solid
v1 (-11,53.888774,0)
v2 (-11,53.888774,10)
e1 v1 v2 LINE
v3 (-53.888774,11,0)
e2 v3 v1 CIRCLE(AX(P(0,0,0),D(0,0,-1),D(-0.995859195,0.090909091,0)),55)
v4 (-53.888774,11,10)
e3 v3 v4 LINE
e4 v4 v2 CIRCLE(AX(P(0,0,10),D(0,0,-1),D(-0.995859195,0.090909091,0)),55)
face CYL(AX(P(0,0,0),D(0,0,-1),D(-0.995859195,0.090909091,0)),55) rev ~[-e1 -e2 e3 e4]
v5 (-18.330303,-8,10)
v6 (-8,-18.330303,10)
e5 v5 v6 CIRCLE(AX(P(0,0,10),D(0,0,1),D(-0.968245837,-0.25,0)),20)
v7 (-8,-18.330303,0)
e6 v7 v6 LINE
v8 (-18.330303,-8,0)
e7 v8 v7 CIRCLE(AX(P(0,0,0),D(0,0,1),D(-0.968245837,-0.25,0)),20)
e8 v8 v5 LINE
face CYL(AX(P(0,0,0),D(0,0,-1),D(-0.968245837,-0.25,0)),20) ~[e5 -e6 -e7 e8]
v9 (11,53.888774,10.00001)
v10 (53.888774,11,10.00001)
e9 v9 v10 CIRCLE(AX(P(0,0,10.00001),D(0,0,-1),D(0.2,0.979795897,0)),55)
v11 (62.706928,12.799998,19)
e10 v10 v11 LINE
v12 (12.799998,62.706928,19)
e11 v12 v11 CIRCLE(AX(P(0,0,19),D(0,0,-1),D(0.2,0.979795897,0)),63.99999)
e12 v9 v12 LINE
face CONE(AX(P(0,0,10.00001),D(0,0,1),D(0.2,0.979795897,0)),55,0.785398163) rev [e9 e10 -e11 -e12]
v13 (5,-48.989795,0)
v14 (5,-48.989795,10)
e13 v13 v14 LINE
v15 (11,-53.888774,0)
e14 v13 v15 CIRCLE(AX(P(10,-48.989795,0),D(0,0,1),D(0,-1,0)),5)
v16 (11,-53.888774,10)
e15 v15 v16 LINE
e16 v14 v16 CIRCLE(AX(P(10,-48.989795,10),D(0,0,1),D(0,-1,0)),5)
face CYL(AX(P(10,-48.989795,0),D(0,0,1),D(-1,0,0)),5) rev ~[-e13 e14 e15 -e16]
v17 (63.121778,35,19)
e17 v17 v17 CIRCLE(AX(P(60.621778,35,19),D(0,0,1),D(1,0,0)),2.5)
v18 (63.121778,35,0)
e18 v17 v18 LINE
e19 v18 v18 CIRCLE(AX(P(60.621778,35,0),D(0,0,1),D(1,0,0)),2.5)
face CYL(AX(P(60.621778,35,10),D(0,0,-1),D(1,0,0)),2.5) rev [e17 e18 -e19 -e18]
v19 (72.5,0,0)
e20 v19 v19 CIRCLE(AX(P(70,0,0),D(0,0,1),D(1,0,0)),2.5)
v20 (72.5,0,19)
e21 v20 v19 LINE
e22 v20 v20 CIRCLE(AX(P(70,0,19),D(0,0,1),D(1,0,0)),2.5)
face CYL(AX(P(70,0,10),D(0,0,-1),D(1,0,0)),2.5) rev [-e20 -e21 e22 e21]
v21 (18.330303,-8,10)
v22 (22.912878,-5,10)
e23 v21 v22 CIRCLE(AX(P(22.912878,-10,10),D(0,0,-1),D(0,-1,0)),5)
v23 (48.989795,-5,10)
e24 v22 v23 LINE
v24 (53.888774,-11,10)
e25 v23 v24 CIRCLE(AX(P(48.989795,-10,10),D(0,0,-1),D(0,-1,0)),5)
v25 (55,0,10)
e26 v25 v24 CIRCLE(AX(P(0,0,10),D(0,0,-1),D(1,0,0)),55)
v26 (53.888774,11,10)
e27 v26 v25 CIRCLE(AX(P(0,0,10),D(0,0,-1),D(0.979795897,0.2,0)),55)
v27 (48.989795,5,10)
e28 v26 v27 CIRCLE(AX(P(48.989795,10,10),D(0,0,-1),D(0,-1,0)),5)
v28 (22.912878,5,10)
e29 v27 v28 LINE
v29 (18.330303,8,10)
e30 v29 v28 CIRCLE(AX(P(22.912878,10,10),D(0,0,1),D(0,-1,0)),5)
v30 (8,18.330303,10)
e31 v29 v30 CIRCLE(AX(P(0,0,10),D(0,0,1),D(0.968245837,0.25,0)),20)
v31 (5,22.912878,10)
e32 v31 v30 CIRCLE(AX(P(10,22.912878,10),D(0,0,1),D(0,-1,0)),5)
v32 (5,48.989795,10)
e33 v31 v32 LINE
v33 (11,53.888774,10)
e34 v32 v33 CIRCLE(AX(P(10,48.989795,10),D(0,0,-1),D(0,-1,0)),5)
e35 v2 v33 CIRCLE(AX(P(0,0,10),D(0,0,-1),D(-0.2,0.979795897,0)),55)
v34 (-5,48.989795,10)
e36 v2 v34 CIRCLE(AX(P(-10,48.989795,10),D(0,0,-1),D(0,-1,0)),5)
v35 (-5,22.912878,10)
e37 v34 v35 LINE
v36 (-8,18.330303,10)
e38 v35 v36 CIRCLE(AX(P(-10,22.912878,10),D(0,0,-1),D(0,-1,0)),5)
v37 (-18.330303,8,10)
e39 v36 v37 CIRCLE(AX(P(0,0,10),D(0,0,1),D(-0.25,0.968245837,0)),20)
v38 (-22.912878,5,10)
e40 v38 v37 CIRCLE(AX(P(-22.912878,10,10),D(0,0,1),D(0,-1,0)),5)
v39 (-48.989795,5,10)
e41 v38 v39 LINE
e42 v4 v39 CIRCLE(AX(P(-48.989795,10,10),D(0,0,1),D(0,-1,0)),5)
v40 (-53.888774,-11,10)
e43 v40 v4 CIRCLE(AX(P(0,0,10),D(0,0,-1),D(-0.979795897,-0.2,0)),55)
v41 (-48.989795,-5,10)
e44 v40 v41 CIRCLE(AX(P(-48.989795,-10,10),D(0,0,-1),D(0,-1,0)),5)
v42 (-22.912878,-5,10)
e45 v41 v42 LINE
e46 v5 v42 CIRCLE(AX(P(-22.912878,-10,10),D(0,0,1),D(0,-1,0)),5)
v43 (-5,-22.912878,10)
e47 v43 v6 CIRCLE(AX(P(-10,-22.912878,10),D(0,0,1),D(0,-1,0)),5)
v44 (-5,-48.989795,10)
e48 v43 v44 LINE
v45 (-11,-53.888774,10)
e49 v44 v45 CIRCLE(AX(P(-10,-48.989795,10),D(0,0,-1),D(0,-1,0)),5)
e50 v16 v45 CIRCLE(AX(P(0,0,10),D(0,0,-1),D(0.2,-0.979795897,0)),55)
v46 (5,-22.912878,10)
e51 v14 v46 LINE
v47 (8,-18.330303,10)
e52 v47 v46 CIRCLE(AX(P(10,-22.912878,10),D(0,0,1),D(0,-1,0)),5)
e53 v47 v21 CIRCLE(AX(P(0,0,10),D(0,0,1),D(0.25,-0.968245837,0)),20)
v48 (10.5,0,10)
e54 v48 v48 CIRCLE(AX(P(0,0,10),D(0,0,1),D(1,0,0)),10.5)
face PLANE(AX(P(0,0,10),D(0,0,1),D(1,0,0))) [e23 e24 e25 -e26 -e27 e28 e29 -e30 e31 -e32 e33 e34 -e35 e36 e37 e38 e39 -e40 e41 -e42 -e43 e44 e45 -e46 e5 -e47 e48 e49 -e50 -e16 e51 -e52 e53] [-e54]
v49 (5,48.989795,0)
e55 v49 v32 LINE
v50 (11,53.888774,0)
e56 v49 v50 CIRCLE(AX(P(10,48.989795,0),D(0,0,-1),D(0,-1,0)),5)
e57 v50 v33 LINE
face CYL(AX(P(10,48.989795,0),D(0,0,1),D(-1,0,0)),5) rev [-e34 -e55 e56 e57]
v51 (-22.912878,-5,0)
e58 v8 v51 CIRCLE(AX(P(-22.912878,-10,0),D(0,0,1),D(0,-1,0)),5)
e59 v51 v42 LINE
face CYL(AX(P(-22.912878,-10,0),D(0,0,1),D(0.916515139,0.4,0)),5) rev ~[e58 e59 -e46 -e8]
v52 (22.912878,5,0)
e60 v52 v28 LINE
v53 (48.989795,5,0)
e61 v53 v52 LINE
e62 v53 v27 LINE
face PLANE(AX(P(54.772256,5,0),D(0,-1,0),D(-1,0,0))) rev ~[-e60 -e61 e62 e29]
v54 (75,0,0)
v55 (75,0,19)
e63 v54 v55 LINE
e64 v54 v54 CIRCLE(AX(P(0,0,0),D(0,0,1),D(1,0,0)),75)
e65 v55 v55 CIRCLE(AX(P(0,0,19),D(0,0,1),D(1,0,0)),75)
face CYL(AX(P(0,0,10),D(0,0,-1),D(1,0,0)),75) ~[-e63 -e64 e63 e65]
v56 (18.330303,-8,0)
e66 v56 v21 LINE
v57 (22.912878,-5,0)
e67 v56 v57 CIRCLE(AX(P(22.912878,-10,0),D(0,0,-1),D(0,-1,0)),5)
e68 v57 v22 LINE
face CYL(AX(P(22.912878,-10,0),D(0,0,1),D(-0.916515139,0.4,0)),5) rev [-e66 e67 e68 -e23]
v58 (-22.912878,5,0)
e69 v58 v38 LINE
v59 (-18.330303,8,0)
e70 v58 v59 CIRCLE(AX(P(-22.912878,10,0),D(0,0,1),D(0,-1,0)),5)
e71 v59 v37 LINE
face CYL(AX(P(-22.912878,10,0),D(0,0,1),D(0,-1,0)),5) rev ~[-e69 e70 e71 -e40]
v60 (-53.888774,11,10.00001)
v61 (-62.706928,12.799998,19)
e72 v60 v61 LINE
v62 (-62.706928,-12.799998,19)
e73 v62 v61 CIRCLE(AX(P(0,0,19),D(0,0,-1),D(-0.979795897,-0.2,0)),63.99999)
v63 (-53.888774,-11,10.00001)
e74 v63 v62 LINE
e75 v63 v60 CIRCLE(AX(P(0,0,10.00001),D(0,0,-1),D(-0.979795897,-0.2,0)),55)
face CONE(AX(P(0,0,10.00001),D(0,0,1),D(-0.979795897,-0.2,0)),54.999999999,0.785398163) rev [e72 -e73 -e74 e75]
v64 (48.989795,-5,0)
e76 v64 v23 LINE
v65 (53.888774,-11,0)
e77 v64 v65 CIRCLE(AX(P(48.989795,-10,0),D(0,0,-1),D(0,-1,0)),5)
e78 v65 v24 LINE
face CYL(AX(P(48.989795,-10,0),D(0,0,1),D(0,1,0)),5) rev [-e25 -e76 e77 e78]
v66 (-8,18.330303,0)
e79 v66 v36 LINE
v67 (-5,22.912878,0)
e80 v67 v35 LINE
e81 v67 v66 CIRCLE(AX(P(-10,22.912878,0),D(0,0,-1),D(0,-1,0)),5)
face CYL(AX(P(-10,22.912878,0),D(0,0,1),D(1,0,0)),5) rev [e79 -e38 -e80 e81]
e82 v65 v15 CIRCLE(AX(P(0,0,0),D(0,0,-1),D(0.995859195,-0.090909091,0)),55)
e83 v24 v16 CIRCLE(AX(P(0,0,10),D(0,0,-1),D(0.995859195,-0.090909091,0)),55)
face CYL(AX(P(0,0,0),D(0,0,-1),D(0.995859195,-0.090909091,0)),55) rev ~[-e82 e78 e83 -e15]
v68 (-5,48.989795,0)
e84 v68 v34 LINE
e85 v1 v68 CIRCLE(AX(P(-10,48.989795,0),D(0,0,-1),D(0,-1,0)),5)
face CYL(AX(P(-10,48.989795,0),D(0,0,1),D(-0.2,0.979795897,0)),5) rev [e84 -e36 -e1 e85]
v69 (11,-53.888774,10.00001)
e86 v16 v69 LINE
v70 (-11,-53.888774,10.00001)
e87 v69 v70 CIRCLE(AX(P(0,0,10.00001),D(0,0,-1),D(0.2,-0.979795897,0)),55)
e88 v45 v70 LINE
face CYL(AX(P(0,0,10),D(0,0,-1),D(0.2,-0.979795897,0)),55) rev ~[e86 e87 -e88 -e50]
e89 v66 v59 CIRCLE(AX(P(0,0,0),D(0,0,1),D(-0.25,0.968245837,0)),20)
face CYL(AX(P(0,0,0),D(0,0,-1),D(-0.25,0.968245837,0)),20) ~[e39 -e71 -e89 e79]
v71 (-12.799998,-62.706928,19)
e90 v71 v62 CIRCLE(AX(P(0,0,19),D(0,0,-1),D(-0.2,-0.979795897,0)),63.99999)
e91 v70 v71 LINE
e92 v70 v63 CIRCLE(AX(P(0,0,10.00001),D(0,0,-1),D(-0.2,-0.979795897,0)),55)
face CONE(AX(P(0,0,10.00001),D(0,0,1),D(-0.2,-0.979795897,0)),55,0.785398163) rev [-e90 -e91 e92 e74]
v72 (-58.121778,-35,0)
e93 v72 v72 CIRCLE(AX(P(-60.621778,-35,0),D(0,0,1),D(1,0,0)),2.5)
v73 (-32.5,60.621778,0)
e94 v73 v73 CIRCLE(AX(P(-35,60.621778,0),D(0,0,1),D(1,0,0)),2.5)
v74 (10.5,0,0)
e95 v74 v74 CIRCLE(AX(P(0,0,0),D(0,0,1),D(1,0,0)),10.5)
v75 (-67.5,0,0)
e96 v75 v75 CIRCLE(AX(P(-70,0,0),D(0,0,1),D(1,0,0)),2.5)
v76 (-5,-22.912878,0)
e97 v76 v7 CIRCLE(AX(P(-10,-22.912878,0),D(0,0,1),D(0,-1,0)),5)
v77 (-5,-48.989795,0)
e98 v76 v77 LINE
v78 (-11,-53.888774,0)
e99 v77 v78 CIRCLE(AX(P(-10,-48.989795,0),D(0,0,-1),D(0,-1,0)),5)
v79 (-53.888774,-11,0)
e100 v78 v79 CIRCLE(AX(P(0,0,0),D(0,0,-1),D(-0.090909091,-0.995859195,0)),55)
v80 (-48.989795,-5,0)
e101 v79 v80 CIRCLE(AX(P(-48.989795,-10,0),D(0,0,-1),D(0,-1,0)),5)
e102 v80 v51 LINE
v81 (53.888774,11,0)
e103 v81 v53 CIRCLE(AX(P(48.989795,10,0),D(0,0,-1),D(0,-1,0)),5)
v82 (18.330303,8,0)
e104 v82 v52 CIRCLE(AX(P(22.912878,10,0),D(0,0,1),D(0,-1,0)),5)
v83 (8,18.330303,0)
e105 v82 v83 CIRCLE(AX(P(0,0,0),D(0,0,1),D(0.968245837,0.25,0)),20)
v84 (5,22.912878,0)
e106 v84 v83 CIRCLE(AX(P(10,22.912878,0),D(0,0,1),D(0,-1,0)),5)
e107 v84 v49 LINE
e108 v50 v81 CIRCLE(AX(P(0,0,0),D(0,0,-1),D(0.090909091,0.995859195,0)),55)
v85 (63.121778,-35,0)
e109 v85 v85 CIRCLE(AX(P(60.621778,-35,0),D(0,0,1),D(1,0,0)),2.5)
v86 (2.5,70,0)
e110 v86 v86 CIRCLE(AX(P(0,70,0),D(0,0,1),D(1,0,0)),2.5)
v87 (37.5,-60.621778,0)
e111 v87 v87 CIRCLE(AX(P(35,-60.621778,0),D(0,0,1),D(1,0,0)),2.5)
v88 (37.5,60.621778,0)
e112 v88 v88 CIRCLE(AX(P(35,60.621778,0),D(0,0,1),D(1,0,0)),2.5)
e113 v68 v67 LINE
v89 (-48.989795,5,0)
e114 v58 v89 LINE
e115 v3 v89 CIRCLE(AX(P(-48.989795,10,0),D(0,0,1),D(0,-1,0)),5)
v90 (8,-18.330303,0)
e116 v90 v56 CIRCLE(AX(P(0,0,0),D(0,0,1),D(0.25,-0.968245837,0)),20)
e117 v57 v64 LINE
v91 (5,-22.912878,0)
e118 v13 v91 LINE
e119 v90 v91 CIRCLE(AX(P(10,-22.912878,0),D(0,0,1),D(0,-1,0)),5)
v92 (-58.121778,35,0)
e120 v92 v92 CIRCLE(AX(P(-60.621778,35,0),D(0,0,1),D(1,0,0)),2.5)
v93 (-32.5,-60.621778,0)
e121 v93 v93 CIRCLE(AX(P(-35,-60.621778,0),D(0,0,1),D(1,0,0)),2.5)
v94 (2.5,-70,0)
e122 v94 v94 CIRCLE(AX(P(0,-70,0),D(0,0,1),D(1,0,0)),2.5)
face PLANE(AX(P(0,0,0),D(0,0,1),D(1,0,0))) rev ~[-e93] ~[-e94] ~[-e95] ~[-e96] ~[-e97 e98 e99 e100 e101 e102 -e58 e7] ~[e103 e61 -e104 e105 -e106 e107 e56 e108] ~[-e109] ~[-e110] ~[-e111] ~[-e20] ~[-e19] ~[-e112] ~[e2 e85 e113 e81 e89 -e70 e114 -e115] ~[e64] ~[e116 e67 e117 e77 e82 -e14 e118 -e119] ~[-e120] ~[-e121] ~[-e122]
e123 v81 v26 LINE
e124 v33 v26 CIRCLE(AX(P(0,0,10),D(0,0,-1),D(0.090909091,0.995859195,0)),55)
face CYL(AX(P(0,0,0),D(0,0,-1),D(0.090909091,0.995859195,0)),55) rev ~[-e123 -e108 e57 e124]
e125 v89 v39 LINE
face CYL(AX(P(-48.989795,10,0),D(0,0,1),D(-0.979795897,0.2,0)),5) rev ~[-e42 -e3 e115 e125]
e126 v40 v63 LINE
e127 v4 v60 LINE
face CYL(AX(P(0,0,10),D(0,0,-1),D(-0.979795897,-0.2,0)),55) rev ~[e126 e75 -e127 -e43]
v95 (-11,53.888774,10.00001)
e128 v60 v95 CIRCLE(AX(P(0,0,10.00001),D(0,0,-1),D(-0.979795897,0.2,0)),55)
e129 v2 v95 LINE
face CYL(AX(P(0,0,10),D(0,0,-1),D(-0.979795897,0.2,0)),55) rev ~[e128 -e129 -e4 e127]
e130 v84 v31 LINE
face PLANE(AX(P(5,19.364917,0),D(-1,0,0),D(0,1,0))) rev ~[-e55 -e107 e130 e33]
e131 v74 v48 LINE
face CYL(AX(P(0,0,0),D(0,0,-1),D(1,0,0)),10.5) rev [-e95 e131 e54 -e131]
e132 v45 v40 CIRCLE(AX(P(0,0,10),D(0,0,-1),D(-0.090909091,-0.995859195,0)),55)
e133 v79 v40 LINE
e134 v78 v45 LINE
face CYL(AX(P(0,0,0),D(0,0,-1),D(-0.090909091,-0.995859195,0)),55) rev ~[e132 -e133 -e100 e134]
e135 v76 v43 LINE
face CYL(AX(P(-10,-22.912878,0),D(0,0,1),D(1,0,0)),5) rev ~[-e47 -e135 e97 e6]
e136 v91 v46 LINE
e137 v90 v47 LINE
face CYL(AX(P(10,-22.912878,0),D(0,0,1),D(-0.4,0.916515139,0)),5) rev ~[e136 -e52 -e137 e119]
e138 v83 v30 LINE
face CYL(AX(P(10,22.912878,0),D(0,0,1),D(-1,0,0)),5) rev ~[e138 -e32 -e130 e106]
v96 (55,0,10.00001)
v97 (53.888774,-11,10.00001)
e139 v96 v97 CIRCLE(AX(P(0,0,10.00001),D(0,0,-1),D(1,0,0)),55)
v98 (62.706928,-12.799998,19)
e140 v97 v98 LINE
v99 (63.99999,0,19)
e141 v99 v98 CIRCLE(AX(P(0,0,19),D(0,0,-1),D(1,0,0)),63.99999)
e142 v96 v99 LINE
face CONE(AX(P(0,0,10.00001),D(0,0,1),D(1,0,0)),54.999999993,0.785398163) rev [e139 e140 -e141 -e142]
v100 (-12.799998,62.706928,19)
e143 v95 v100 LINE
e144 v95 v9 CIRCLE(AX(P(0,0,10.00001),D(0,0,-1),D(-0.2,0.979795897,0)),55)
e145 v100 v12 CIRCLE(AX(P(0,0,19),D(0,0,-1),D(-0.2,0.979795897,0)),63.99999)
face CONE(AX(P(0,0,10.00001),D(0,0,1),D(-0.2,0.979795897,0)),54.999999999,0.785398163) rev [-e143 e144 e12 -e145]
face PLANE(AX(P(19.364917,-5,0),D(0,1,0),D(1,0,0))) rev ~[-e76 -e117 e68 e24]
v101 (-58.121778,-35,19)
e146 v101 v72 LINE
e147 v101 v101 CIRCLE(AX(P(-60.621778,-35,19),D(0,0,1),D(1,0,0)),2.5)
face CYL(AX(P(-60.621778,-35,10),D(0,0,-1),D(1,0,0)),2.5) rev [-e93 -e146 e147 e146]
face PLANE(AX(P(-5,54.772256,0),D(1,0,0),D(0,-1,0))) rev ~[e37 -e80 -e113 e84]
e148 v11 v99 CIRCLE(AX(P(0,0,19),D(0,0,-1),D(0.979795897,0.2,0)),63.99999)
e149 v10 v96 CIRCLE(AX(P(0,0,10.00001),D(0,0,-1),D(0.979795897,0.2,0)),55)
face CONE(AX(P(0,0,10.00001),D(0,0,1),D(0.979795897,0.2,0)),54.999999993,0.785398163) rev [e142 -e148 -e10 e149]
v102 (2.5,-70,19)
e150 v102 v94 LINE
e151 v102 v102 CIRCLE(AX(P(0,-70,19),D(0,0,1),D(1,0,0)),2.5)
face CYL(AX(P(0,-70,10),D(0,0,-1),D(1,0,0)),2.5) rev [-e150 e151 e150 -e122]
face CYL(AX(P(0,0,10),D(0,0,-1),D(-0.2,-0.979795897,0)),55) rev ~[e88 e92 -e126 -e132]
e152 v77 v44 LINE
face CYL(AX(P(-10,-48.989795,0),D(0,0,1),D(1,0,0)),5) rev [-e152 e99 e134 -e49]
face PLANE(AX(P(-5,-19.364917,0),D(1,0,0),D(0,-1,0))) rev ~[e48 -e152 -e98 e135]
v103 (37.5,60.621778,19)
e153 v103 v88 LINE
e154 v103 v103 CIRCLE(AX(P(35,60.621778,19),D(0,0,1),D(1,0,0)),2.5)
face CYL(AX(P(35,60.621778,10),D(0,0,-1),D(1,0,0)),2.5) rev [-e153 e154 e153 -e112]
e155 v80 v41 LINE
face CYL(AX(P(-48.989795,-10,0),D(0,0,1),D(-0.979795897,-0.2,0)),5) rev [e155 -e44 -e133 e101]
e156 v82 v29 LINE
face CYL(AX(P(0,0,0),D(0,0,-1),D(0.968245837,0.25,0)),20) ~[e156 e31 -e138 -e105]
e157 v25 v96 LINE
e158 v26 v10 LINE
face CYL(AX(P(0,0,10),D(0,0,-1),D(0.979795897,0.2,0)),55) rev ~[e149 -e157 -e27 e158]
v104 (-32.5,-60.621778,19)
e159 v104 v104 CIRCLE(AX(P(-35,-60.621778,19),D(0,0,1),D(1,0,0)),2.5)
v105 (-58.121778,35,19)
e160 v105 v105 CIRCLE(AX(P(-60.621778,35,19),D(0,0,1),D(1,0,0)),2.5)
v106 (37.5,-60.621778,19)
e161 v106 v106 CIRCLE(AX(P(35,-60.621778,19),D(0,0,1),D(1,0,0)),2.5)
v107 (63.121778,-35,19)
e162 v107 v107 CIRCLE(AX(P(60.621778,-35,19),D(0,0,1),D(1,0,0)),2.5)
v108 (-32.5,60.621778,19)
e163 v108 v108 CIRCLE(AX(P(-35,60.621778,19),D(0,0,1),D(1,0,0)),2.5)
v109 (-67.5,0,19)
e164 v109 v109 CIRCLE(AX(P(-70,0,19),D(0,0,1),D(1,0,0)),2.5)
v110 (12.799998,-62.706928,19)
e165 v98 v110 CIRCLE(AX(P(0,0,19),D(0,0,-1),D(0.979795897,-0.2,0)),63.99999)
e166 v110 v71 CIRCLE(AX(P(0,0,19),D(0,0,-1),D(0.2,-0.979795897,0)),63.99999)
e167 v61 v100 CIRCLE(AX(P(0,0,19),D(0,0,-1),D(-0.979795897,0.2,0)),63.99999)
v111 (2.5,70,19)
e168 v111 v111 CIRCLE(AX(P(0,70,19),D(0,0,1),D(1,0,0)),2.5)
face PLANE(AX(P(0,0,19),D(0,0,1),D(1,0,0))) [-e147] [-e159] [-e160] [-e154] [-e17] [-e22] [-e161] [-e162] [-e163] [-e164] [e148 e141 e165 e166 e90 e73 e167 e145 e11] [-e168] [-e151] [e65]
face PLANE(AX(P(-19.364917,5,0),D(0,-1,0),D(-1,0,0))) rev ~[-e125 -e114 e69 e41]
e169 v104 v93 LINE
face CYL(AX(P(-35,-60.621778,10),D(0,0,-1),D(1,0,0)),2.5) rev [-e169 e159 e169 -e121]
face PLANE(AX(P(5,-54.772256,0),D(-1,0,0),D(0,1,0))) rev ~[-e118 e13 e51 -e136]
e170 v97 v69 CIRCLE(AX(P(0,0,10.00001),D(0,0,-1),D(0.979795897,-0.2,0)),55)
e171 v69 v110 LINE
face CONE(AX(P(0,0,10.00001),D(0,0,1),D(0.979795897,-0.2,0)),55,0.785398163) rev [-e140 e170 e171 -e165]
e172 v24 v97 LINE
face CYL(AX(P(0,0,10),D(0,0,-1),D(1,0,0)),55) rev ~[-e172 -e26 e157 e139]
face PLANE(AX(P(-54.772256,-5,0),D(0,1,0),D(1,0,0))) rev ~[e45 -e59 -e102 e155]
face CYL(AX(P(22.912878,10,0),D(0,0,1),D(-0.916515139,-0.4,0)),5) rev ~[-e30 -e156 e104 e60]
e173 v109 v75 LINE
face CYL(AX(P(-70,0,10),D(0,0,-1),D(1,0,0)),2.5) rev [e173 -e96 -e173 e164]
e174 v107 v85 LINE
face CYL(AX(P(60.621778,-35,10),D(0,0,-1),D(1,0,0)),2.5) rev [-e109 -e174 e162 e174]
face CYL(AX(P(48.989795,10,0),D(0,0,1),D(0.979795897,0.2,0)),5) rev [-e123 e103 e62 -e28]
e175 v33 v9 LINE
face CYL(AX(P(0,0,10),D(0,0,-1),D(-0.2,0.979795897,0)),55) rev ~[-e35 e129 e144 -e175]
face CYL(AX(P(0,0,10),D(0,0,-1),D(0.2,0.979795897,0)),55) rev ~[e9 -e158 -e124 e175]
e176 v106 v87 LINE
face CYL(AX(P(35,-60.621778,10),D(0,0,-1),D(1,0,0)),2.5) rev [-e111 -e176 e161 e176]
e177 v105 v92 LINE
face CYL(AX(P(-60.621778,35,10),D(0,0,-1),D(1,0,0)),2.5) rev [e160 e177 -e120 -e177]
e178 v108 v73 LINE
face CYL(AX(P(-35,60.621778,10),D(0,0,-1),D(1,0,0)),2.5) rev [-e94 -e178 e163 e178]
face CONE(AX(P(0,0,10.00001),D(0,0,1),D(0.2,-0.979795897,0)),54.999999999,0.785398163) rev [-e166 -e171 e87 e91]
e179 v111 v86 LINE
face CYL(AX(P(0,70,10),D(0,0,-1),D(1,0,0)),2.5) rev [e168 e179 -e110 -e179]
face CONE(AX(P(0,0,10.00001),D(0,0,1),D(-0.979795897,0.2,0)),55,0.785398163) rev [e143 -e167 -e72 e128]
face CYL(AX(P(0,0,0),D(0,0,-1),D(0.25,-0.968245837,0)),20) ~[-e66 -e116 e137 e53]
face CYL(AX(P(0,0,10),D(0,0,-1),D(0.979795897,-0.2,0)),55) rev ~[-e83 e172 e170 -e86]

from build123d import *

# Parameters (mm, degrees)
F0_R     = 75
F0_R_2   = 2.5
F0_R_3   = 10.5
F1_DEPTH = 10
F2_R     = 5
F3_R     = 75
F3_R_2   = 2.5
F4_DEPTH = 9
F5_SIZE  = 8.99999


# Not quite as in the source:
# - a fillet or chamfer is up to 0.001 mm smaller than in the source, because OpenCascade refuses the exact size


with BuildPart() as f1:
    # F0 (on Top) → F1 (new body)
    with BuildSketch(Plane.XY):
        Circle(F0_R)
        with Locations((-35, -60.6217782649)):
            Circle(F0_R_2, mode=Mode.SUBTRACT)
        with Locations((-60.6217782649, -35)):
            Circle(F0_R_2, mode=Mode.SUBTRACT)
        with BuildLine():
            ThreePointArc((-5, -54.7722557505), (-38.8908729653, -38.8908729653), (-54.7722557505, -5))
            Line((-54.7722557505, -5), (-19.364916731, -5))
            ThreePointArc((-19.364916731, -5), (-14.1421356237, -14.1421356237), (-5, -19.364916731))
            Line((-5, -19.364916731), (-5, -54.7722557505))
        make_face(mode=Mode.SUBTRACT)
        with Locations((0, -70)):
            Circle(F0_R_2, mode=Mode.SUBTRACT)
        with Locations((35, -60.6217782649)):
            Circle(F0_R_2, mode=Mode.SUBTRACT)
        with BuildLine():
            Line((19.364916731, -5), (54.7722557505, -5))
            ThreePointArc((54.7722557505, -5), (38.8908729653, -38.8908729653), (5, -54.7722557505))
            Line((5, -54.7722557505), (5, -19.364916731))
            ThreePointArc((5, -19.364916731), (14.1421356237, -14.1421356237), (19.364916731, -5))
        make_face(mode=Mode.SUBTRACT)
        with Locations((60.6217782649, -35)):
            Circle(F0_R_2, mode=Mode.SUBTRACT)
        with Locations((-70, 0)):
            Circle(F0_R_2, mode=Mode.SUBTRACT)
        with Locations((-60.6217782649, 35)):
            Circle(F0_R_2, mode=Mode.SUBTRACT)
        with BuildLine():
            Line((-5, 54.7722557505), (-5, 19.364916731))
            ThreePointArc((-5, 19.364916731), (-14.1421356237, 14.1421356237), (-19.364916731, 5))
            Line((-19.364916731, 5), (-54.7722557505, 5))
            ThreePointArc((-54.7722557505, 5), (-38.8908729653, 38.8908729653), (-5, 54.7722557505))
        make_face(mode=Mode.SUBTRACT)
        with Locations((-35, 60.6217782649)):
            Circle(F0_R_2, mode=Mode.SUBTRACT)
        Circle(F0_R_3, mode=Mode.SUBTRACT)
        with BuildLine():
            ThreePointArc((5, 54.7722557505), (38.8908729653, 38.8908729653), (54.7722557505, 5))
            Line((54.7722557505, 5), (19.364916731, 5))
            ThreePointArc((19.364916731, 5), (14.1421356237, 14.1421356237), (5, 19.364916731))
            Line((5, 19.364916731), (5, 54.7722557505))
        make_face(mode=Mode.SUBTRACT)
        with Locations((70, 0)):
            Circle(F0_R_2, mode=Mode.SUBTRACT)
        with Locations((60.6217782649, 35)):
            Circle(F0_R_2, mode=Mode.SUBTRACT)
        with Locations((0, 70)):
            Circle(F0_R_2, mode=Mode.SUBTRACT)
        with Locations((35, 60.6217782649)):
            Circle(F0_R_2, mode=Mode.SUBTRACT)
    extrude(amount=F1_DEPTH)

    # F2
    f2_edges = [f1.edges().sort_by_distance(p)[0] for p in [
        (5, -54.772256, 5),
        (5, -19.364917, 5),
        (19.364917, -5, 5),
        (19.364917, 5, 5),
        (5, 19.364917, 5),
        (-5, 19.364917, 5),
        (-19.364917, 5, 5),
        (-5, -19.364917, 5),
        (-19.364917, -5, 5),
        (54.772256, 5, 5),
        (54.772256, -5, 5),
        (5, 54.772256, 5),
        (-54.772256, -5, 5),
        (-5, 54.772256, 5),
        (-5, -54.772256, 5),
        (-54.772256, 5, 5),
    ]]
    fillet(f2_edges, radius=F2_R)

    # F3 (on face) → F4 (join)
    with BuildSketch(Plane.XY.offset(10)):
        Circle(F3_R)
        with Locations((-35, -60.6217782649)):
            Circle(F3_R_2, mode=Mode.SUBTRACT)
        with Locations((-60.6217782649, -35)):
            Circle(F3_R_2, mode=Mode.SUBTRACT)
        with Locations((0, -70)):
            Circle(F3_R_2, mode=Mode.SUBTRACT)
        with Locations((35, -60.6217782649)):
            Circle(F3_R_2, mode=Mode.SUBTRACT)
        with Locations((60.6217782649, -35)):
            Circle(F3_R_2, mode=Mode.SUBTRACT)
        with Locations((-70, 0)):
            Circle(F3_R_2, mode=Mode.SUBTRACT)
        with Locations((-60.6217782649, 35)):
            Circle(F3_R_2, mode=Mode.SUBTRACT)
        with Locations((-35, 60.6217782649)):
            Circle(F3_R_2, mode=Mode.SUBTRACT)
        with BuildLine():
            ThreePointArc((53.8887743412, 11), (54.7214884153, 5.5279929103), (55, 0))
            ThreePointArc((55, 0), (54.7214884153, -5.5279929103), (53.8887743412, -11))
            ThreePointArc((53.8887743412, -11), (38.8908729653, -38.8908729653), (11, -53.8887743412))
            ThreePointArc((11, -53.8887743412), (0, -55), (-11, -53.8887743412))
            ThreePointArc((-11, -53.8887743412), (-38.8908729653, -38.8908729653), (-53.8887743412, -11))
            ThreePointArc((-53.8887743412, -11), (-55, 0), (-53.8887743412, 11))
            ThreePointArc((-53.8887743412, 11), (-38.8908729653, 38.8908729653), (-11, 53.8887743412))
            ThreePointArc((-11, 53.8887743412), (0, 55), (11, 53.8887743412))
            ThreePointArc((11, 53.8887743412), (38.8908729653, 38.8908729653), (53.8887743412, 11))
        make_face(mode=Mode.SUBTRACT)
        with Locations((70, 0)):
            Circle(F3_R_2, mode=Mode.SUBTRACT)
        with Locations((60.6217782649, 35)):
            Circle(F3_R_2, mode=Mode.SUBTRACT)
        with Locations((0, 70)):
            Circle(F3_R_2, mode=Mode.SUBTRACT)
        with Locations((35, 60.6217782649)):
            Circle(F3_R_2, mode=Mode.SUBTRACT)
    extrude(amount=F4_DEPTH)

    # F5 (size 9 in the source; OpenCascade refuses exactly that, so slightly less here)
    f5_edges = [f1.edges().sort_by_distance(p)[0] for p in [
        (53.888774, 11, 19),
    ]]
    chamfer(f5_edges, length=F5_SIZE)


solid = f1.part
